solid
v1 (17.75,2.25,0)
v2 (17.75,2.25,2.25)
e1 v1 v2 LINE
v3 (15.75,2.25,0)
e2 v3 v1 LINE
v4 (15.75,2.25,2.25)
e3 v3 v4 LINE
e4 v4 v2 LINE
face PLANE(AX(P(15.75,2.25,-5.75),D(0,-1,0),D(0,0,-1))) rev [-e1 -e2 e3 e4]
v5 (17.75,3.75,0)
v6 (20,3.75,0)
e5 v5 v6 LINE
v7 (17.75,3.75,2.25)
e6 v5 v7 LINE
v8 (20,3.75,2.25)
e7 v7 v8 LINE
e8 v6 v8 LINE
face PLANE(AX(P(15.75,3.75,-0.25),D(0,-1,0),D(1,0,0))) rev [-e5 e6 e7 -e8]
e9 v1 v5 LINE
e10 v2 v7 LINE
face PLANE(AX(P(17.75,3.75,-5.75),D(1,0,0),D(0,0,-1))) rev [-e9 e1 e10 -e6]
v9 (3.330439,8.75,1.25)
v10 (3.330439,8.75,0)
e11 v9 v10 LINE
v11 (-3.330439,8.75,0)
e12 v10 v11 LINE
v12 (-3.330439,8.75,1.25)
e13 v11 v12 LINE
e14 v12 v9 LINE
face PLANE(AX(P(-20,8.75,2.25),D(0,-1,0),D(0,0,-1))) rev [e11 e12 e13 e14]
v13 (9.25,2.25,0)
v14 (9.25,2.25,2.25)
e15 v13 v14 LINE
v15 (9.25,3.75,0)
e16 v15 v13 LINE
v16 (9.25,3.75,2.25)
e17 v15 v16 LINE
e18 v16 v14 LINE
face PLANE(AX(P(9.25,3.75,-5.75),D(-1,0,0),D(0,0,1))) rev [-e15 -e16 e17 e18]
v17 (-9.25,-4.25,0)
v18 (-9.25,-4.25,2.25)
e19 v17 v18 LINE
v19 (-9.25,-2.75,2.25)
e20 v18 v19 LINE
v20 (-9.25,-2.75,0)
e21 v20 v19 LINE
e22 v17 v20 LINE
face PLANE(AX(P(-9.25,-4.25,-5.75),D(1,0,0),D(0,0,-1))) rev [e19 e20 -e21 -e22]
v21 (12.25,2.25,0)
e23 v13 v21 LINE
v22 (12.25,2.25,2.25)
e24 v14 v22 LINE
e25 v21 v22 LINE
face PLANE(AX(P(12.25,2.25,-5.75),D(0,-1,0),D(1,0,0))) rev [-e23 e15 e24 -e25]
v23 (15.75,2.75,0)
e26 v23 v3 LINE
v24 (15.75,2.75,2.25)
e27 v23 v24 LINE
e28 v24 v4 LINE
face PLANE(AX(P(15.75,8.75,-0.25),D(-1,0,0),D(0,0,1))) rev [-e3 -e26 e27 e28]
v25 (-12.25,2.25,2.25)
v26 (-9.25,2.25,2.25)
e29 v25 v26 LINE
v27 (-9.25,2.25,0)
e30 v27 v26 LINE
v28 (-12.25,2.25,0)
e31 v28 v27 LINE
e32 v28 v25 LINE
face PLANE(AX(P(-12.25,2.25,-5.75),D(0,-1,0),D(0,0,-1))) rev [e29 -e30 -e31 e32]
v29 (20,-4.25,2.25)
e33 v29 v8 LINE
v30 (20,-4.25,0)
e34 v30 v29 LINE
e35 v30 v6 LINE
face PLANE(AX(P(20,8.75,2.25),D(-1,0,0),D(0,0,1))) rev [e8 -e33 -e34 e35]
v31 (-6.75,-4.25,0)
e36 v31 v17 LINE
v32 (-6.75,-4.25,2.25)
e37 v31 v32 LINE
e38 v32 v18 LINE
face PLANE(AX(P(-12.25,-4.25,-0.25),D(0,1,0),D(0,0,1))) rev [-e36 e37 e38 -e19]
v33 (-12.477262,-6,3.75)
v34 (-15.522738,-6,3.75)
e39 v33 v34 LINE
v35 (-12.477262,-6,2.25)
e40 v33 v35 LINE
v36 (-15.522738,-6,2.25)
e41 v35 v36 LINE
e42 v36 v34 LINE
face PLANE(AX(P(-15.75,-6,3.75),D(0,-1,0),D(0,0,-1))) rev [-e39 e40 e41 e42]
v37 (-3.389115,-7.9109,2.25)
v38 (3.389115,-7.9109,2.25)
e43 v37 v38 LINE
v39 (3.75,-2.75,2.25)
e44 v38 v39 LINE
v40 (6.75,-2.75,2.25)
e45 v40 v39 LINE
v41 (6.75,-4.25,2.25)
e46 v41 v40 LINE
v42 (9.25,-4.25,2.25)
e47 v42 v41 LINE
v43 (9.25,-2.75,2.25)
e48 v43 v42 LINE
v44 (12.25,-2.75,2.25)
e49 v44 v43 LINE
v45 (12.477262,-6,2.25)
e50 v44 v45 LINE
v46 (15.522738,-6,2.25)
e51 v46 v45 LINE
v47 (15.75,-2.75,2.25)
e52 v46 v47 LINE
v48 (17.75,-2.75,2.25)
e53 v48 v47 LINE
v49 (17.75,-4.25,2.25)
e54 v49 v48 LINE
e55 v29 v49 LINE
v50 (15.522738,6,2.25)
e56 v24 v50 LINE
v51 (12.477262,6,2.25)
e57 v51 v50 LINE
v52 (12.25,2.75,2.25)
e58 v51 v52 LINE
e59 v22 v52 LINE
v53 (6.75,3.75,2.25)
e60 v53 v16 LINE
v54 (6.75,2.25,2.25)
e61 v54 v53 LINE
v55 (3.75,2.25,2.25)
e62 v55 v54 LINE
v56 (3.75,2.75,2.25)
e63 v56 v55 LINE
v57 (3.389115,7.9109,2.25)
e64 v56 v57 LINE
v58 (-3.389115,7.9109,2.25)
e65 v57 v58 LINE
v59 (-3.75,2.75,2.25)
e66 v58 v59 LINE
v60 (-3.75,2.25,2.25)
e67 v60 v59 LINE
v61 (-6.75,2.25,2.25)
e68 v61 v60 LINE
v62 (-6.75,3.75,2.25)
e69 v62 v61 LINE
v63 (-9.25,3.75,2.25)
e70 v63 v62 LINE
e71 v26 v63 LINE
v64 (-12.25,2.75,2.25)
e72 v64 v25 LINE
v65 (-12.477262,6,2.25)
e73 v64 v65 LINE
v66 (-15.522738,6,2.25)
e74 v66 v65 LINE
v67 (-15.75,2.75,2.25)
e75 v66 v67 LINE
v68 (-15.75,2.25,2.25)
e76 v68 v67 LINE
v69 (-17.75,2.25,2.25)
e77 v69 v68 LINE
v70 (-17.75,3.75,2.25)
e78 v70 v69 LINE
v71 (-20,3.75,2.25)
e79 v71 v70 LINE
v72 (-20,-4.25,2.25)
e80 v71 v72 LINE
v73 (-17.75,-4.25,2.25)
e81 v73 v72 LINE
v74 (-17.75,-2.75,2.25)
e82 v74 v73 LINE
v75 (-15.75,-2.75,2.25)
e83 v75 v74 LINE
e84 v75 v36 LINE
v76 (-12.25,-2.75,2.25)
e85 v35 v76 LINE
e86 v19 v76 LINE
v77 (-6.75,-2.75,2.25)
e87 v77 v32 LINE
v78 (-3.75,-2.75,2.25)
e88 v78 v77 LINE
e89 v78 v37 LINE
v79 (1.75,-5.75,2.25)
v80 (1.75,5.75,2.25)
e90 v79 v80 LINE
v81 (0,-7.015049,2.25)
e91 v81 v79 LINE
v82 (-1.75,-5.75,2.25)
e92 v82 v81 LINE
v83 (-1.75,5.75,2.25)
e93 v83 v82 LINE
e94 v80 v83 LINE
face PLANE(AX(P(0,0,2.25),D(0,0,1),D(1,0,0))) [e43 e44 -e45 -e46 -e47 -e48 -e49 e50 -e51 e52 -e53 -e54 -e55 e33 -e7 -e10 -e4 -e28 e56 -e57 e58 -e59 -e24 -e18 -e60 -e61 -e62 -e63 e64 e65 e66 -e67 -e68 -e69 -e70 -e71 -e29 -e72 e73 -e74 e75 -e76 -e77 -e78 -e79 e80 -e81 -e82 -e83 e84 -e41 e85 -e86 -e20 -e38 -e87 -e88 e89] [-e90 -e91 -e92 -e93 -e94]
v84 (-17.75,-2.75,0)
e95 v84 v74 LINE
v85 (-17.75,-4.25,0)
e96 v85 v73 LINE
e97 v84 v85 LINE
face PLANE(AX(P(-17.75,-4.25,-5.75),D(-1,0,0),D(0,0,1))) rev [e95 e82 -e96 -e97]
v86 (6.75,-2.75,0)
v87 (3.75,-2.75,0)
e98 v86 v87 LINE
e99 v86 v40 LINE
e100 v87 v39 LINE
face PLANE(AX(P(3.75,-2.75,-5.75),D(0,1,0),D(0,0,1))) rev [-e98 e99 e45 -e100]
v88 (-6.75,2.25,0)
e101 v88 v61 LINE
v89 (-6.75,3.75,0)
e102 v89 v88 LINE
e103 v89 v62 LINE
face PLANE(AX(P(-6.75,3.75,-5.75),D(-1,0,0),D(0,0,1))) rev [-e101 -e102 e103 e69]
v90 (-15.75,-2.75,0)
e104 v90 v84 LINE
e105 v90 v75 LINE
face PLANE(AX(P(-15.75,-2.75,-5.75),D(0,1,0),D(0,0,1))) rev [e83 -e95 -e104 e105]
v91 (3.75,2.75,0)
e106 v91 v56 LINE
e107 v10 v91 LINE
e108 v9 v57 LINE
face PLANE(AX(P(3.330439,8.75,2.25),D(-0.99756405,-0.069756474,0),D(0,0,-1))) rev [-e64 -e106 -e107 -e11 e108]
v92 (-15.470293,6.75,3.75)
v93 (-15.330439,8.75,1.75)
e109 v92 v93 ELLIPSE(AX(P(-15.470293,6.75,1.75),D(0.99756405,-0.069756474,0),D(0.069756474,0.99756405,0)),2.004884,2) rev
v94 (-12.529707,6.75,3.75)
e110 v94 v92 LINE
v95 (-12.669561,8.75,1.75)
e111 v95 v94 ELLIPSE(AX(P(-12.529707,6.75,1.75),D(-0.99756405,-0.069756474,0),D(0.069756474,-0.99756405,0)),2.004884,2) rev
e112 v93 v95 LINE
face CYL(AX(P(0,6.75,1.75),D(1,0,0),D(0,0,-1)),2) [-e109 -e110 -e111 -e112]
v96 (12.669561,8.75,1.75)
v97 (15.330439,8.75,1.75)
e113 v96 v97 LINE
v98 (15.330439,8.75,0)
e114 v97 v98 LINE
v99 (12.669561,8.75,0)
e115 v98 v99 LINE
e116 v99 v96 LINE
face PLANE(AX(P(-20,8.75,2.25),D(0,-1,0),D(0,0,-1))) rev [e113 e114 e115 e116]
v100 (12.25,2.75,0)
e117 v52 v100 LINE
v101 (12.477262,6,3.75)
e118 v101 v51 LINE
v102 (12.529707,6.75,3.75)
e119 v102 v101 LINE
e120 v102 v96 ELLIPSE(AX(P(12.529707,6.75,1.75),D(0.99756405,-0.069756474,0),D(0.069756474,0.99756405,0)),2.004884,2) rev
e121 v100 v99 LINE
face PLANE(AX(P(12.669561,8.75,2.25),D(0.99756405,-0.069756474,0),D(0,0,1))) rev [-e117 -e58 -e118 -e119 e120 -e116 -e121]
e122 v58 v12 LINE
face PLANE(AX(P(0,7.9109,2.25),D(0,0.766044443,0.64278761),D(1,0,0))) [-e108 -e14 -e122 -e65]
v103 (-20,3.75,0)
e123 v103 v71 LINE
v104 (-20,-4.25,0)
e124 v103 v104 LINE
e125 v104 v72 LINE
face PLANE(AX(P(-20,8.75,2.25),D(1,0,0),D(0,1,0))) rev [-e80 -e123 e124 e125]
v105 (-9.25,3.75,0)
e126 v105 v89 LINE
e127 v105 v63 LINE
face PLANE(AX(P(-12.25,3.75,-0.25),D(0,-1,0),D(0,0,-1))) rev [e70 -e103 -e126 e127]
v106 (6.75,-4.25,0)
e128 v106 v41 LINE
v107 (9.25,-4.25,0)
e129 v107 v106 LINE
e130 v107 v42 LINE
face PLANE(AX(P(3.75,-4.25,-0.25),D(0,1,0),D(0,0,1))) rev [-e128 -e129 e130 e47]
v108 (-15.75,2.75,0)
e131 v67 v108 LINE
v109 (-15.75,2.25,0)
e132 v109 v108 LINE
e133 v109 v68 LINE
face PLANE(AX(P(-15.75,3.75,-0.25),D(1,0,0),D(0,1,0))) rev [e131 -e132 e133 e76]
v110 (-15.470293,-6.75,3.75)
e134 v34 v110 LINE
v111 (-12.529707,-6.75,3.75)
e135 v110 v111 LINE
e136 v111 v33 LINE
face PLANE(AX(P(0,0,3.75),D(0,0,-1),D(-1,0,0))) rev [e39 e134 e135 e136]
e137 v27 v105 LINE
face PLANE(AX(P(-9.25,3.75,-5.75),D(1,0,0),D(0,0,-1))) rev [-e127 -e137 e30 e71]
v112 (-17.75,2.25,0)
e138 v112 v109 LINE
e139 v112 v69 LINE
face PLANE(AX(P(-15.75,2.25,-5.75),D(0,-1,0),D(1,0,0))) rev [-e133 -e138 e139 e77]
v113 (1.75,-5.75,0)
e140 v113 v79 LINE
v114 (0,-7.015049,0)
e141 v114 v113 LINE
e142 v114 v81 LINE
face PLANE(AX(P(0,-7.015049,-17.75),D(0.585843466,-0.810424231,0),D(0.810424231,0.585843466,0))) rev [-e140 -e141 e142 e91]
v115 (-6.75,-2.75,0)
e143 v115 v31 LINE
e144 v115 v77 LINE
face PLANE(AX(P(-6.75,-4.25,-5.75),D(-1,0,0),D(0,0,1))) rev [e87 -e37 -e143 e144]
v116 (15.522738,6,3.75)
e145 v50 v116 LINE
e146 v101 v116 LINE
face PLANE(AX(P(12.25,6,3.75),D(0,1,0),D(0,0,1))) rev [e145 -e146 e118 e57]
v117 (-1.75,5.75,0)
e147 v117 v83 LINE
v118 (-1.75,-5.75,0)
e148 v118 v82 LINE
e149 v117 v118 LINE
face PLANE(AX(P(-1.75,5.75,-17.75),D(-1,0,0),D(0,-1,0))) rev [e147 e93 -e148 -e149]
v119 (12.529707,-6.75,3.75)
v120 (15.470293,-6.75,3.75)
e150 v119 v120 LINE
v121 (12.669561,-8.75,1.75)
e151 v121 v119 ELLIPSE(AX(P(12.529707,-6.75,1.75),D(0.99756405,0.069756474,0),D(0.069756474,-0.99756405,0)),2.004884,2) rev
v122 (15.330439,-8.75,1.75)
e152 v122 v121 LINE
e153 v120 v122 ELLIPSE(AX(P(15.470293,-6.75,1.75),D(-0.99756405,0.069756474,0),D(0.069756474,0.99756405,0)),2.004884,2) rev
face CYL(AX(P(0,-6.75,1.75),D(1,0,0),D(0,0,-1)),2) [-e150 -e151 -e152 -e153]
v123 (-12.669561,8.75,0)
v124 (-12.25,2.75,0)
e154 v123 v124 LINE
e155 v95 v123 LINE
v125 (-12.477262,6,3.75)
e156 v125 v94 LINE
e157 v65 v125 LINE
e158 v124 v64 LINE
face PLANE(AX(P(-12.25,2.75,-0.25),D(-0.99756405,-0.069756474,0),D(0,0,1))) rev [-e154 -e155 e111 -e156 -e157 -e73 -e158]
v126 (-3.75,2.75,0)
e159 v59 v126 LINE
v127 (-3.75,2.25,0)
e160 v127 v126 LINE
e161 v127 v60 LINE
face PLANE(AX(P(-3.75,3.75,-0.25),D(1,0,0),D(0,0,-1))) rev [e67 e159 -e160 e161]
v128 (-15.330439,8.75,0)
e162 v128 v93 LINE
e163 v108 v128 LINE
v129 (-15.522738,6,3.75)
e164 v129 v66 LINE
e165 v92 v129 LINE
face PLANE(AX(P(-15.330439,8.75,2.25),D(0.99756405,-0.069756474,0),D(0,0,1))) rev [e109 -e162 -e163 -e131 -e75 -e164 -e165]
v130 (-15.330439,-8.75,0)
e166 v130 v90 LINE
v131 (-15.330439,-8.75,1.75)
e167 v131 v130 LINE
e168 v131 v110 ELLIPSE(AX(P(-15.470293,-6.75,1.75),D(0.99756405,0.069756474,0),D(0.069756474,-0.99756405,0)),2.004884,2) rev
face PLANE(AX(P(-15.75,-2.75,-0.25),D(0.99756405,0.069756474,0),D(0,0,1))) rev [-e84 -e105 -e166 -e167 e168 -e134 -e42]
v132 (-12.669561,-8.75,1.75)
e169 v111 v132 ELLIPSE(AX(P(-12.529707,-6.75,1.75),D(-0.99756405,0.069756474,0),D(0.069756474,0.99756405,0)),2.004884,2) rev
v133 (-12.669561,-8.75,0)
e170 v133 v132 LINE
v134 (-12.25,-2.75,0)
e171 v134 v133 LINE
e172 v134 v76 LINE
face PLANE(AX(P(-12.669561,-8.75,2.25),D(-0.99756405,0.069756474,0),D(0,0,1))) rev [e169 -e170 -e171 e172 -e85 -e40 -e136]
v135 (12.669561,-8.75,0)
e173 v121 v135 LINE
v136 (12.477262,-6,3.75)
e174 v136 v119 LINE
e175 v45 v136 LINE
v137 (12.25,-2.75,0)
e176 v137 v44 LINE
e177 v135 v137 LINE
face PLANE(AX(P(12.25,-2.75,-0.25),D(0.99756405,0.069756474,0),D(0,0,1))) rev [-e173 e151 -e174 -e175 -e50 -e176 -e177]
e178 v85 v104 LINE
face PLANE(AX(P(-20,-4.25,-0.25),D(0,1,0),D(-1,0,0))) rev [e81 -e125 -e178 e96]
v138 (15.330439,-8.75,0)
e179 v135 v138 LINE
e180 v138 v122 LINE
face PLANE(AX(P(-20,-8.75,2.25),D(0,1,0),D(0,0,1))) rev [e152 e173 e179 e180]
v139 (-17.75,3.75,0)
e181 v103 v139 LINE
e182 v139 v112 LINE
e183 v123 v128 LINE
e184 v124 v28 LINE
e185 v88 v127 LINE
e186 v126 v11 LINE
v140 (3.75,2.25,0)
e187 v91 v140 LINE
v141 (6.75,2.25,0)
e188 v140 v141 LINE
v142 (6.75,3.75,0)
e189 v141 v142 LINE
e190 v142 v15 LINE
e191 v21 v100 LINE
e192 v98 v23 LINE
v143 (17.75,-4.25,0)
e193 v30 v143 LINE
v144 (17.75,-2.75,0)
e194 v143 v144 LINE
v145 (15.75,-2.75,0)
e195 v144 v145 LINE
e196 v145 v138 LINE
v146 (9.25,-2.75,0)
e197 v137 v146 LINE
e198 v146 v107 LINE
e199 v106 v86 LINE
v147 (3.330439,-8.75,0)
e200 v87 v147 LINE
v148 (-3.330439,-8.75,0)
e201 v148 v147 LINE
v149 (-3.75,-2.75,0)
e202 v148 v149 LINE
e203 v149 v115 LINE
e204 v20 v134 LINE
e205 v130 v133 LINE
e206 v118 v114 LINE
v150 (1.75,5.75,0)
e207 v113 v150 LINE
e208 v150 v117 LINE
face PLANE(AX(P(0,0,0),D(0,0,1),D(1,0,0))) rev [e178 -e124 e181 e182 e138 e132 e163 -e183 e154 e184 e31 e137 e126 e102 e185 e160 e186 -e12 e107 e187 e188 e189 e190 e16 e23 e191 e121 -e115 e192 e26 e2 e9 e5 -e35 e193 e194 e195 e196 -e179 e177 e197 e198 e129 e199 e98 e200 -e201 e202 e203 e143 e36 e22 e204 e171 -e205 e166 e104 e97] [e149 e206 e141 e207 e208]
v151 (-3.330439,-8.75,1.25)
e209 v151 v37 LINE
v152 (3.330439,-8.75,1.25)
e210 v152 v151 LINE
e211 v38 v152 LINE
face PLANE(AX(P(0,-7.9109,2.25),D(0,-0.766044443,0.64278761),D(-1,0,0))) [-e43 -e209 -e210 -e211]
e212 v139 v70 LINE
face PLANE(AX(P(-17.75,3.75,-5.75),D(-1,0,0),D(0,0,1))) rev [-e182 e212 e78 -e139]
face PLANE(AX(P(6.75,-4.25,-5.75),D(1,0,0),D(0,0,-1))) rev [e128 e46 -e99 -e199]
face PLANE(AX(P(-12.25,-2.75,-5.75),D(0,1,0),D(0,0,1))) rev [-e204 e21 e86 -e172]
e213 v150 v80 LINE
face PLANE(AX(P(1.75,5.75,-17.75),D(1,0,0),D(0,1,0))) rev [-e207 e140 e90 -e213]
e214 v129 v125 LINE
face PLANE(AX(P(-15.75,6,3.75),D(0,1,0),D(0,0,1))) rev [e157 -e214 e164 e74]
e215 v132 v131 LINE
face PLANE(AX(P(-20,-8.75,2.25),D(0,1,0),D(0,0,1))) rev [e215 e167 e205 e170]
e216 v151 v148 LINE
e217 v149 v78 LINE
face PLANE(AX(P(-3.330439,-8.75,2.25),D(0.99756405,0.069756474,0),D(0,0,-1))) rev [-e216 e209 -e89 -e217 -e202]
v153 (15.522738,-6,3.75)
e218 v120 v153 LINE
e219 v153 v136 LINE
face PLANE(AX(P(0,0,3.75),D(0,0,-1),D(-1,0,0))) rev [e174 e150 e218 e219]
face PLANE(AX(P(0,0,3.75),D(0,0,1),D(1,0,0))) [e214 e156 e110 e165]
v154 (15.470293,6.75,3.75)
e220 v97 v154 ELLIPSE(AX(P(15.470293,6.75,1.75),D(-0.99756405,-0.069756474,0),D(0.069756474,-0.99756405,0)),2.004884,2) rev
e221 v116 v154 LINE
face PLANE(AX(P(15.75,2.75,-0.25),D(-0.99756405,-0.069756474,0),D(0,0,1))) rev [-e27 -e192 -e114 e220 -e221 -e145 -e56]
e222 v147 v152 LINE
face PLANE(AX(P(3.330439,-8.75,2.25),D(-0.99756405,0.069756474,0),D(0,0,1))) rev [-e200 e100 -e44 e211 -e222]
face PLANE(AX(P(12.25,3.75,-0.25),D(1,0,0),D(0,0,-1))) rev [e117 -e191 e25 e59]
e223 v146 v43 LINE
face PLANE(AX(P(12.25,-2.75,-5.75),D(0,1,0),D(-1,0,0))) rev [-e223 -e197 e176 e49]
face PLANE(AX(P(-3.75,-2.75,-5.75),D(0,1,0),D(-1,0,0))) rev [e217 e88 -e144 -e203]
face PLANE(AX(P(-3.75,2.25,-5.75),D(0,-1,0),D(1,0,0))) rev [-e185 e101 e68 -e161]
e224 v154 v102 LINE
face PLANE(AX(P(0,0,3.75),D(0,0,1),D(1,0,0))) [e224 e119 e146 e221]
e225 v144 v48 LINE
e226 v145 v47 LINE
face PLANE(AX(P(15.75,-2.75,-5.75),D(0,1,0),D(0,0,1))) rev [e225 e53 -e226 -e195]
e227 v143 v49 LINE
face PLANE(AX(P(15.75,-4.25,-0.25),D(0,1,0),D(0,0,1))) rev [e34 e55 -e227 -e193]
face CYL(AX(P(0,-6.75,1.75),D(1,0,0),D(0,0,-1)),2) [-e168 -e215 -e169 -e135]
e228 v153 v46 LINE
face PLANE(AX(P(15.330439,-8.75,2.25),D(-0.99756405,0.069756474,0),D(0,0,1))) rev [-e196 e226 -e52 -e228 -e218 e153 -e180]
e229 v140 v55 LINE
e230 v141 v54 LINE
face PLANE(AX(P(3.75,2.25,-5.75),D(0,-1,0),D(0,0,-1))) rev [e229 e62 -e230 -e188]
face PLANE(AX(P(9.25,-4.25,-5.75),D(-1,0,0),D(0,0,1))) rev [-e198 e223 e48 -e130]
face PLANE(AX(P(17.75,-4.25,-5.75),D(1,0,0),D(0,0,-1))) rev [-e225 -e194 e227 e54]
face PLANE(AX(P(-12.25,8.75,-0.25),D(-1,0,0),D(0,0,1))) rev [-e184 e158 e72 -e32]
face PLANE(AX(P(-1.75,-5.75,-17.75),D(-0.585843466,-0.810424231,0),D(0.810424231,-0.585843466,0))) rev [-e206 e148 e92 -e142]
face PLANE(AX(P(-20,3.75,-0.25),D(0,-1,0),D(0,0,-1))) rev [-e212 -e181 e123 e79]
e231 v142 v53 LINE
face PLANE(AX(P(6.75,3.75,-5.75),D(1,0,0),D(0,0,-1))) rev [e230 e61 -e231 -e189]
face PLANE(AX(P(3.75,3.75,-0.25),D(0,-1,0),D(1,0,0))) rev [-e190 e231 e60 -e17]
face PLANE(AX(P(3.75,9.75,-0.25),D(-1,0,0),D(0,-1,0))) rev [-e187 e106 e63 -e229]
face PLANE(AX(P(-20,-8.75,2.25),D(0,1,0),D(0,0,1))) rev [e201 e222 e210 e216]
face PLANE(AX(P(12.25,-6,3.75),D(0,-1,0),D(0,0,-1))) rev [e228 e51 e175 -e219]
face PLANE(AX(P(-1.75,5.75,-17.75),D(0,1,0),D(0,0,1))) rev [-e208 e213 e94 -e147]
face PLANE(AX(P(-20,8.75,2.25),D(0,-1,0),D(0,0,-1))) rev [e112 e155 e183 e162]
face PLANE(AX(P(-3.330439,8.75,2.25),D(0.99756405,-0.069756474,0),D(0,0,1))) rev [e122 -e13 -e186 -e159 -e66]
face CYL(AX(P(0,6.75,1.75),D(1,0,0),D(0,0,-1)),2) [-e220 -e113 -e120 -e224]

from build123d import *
from OCP.BRepFilletAPI import BRepFilletAPI_MakeChamfer

# Parameters (mm, degrees)
ESBO_O10_W               = 40
ESBO_O10_H               = 17.5
RESSALTO_EXTRUS_O6_DEPTH = 2.25
CORTE_EXTRUS_O2_DEPTH    = 2.5
ESBO_O12_W               = 3.5
ESBO_O12_H               = 2.75
RESSALTO_EXTRUS_O7_DEPTH = 1.5
ESBO_O13_W               = 3
ESBO_O13_H               = 1.5
ESBO_O13_W_2             = 2
CORTE_EXTRUS_O3_DEPTH    = 8
CORTE_EXTRUS_O4_DEPTH    = 20
CHANFRO5_SIZE            = 6
CHANFRO5_SIZE_2          = 0.419560872
CHANFRO6_SIZE            = 1
CHANFRO6_SIZE2           = 0.839099631
FILETE1_R                = 2


with BuildPart() as part:
    # Esboço10 → Ressalto-extrusão6 (new body)
    with BuildSketch(Plane.XY):
        Rectangle(ESBO_O10_W, ESBO_O10_H)
    extrude(amount=RESSALTO_EXTRUS_O6_DEPTH)

    # Esboço11 → Corte-extrusão2 (cut)
    with BuildSketch(Plane.XY.offset(2.25)):
        Polygon((-20, 3.75), (-15.75, 3.75), (-15.75, 8.75), (-12.25, 8.75), (-12.25, 3.75), (-3.75, 3.75), (-3.75, 9.75), (3.75, 9.75), (3.75, 3.75), (12.25, 3.75), (12.25, 8.75), (15.75, 8.75), (15.75, 3.75), (20, 3.75), (20, 11.902365005), (-20, 11.902365005), align=None)
        Polygon((-20, -4.25), (-15.75, -4.25), (-15.75, -8.75), (-12.25, -8.75), (-12.25, -4.25), (-3.75, -4.25), (-3.75, -10.25), (3.75, -9.74672567), (3.75, -4.25), (12.25, -4.25), (12.25, -8.75), (15.75, -8.75), (15.75, -4.25), (20, -4.25), (20, -11.31917021), (-20, -11.31917021), align=None)
    extrude(amount=-CORTE_EXTRUS_O2_DEPTH, mode=Mode.SUBTRACT)

    # Esboço12 → Ressalto-extrusão7 (add)
    with BuildSketch(Plane.XY.offset(2.25)):
        with Locations((-14, 7.375)):
            Rectangle(ESBO_O12_W, ESBO_O12_H)
        with Locations((-14, -7.375)):
            Rectangle(ESBO_O12_W, ESBO_O12_H)
        with Locations((14, -7.375)):
            Rectangle(ESBO_O12_W, ESBO_O12_H)
        with Locations((14, 7.375)):
            Rectangle(ESBO_O12_W, ESBO_O12_H)
    extrude(amount=RESSALTO_EXTRUS_O7_DEPTH)

    # Esboço13 → Corte-extrusão3 (cut)
    with BuildSketch(Plane.XY.offset(2.25)):
        with Locations((-10.75, 3)):
            Rectangle(ESBO_O13_W, ESBO_O13_H)
        with Locations((-5.25, 3)):
            Rectangle(ESBO_O13_W, ESBO_O13_H)
        with Locations((5.25, 3)):
            Rectangle(ESBO_O13_W, ESBO_O13_H)
        with Locations((10.75, 3)):
            Rectangle(ESBO_O13_W, ESBO_O13_H)
        with Locations((10.75, -3.5)):
            Rectangle(ESBO_O13_W, ESBO_O13_H)
        with Locations((5.25, -3.5)):
            Rectangle(ESBO_O13_W, ESBO_O13_H)
        with Locations((-5.25, -3.5)):
            Rectangle(ESBO_O13_W, ESBO_O13_H)
        with Locations((-10.75, -3.5)):
            Rectangle(ESBO_O13_W, ESBO_O13_H)
        with Locations((-16.75, -3.5)):
            Rectangle(ESBO_O13_W_2, ESBO_O13_H)
        with Locations((-16.75, 3)):
            Rectangle(ESBO_O13_W_2, ESBO_O13_H)
        with Locations((16.75, 3)):
            Rectangle(ESBO_O13_W_2, ESBO_O13_H)
        with Locations((16.75, -3.5)):
            Rectangle(ESBO_O13_W_2, ESBO_O13_H)
    extrude(amount=-CORTE_EXTRUS_O3_DEPTH, mode=Mode.SUBTRACT)

    # Esboço15 → Corte-extrusão4 (cut)
    with BuildSketch(Plane.XY.offset(2.25)):
        Polygon((-1.75, 5.75), (1.75, 5.75), (1.75, -5.75), (0, -7.015048633), (-1.75, -5.75), align=None)
    extrude(amount=-CORTE_EXTRUS_O4_DEPTH, mode=Mode.SUBTRACT)

    # Chanfro5
    chanfro5_edges_1 = [part.edges().sort_by_distance(p)[0] for p in [
        (-15.75, -8.75, 1.875),
    ]]
    chanfro5_side_1 = [part.faces().sort_by_distance(p)[0] for p in [
        (-15.75, -8.741608783, 1.875),
    ]]
    chanfro5_edges_2 = [part.edges().sort_by_distance(p)[0] for p in [
        (-3.75, -8.75, 1.125),
    ]]
    chanfro5_side_2 = [part.faces().sort_by_distance(p)[0] for p in [
        (-3.75, -8.741608783, 1.125),
    ]]
    chanfro5_edges_3 = [part.edges().sort_by_distance(p)[0] for p in [
        (12.25, -8.75, 1.875),
    ]]
    chanfro5_side_3 = [part.faces().sort_by_distance(p)[0] for p in [
        (12.25, -8.741608783, 1.875),
    ]]
    chanfro5_edges_4 = [part.edges().sort_by_distance(p)[0] for p in [
        (15.75, 8.75, 1.875),
    ]]
    chanfro5_side_4 = [part.faces().sort_by_distance(p)[0] for p in [
        (15.741608783, 8.75, 1.875),
    ]]
    chanfro5_edges_5 = [part.edges().sort_by_distance(p)[0] for p in [
        (3.75, 8.75, 1.125),
    ]]
    chanfro5_side_5 = [part.faces().sort_by_distance(p)[0] for p in [
        (3.741608783, 8.75, 1.125),
    ]]
    chanfro5_edges_6 = [part.edges().sort_by_distance(p)[0] for p in [
        (-12.25, 8.75, 1.875),
    ]]
    chanfro5_side_6 = [part.faces().sort_by_distance(p)[0] for p in [
        (-12.258391217, 8.75, 1.875),
    ]]
    chanfro5_edges_7 = [part.edges().sort_by_distance(p)[0] for p in [
        (-12.25, -8.75, 1.875),
    ]]
    chanfro5_side_7 = [part.faces().sort_by_distance(p)[0] for p in [
        (-12.258391217, -8.75, 1.875),
    ]]
    chanfro5_edges_8 = [part.edges().sort_by_distance(p)[0] for p in [
        (3.75, -8.75, 1.125),
    ]]
    chanfro5_side_8 = [part.faces().sort_by_distance(p)[0] for p in [
        (3.741608783, -8.75, 1.125),
    ]]
    chanfro5_edges_9 = [part.edges().sort_by_distance(p)[0] for p in [
        (15.75, -8.75, 1.875),
    ]]
    chanfro5_side_9 = [part.faces().sort_by_distance(p)[0] for p in [
        (15.741608783, -8.75, 1.875),
    ]]
    chanfro5_edges_10 = [part.edges().sort_by_distance(p)[0] for p in [
        (12.25, 8.75, 1.875),
    ]]
    chanfro5_side_10 = [part.faces().sort_by_distance(p)[0] for p in [
        (12.25, 8.741608783, 1.875),
    ]]
    chanfro5_edges_11 = [part.edges().sort_by_distance(p)[0] for p in [
        (-3.75, 8.75, 1.125),
    ]]
    chanfro5_side_11 = [part.faces().sort_by_distance(p)[0] for p in [
        (-3.75, 8.741608783, 1.125),
    ]]
    chanfro5_edges_12 = [part.edges().sort_by_distance(p)[0] for p in [
        (-15.75, 8.75, 1.875),
    ]]
    chanfro5_side_12 = [part.faces().sort_by_distance(p)[0] for p in [
        (-15.741608783, 8.75, 1.875),
    ]]
    chanfro5 = BRepFilletAPI_MakeChamfer(part.part.solid().wrapped)
    for e in chanfro5_edges_1:
        chanfro5.Add(CHANFRO5_SIZE - 0.0001, CHANFRO5_SIZE_2 - 0.0001, e.wrapped, chanfro5_side_1[0].wrapped)
    for e in chanfro5_edges_2:
        chanfro5.Add(CHANFRO5_SIZE - 0.0001, CHANFRO5_SIZE_2 - 0.0001, e.wrapped, chanfro5_side_2[0].wrapped)
    for e in chanfro5_edges_3:
        chanfro5.Add(CHANFRO5_SIZE - 0.0001, CHANFRO5_SIZE_2 - 0.0001, e.wrapped, chanfro5_side_3[0].wrapped)
    for e in chanfro5_edges_4:
        chanfro5.Add(CHANFRO5_SIZE_2 - 0.0001, CHANFRO5_SIZE - 0.0001, e.wrapped, chanfro5_side_4[0].wrapped)
    for e in chanfro5_edges_5:
        chanfro5.Add(CHANFRO5_SIZE_2 - 0.0001, CHANFRO5_SIZE - 0.0001, e.wrapped, chanfro5_side_5[0].wrapped)
    for e in chanfro5_edges_6:
        chanfro5.Add(CHANFRO5_SIZE_2 - 0.0001, CHANFRO5_SIZE - 0.0001, e.wrapped, chanfro5_side_6[0].wrapped)
    for e in chanfro5_edges_7:
        chanfro5.Add(CHANFRO5_SIZE_2 - 0.0001, CHANFRO5_SIZE - 0.0001, e.wrapped, chanfro5_side_7[0].wrapped)
    for e in chanfro5_edges_8:
        chanfro5.Add(CHANFRO5_SIZE_2 - 0.0001, CHANFRO5_SIZE - 0.0001, e.wrapped, chanfro5_side_8[0].wrapped)
    for e in chanfro5_edges_9:
        chanfro5.Add(CHANFRO5_SIZE_2 - 0.0001, CHANFRO5_SIZE - 0.0001, e.wrapped, chanfro5_side_9[0].wrapped)
    for e in chanfro5_edges_10:
        chanfro5.Add(CHANFRO5_SIZE - 0.0001, CHANFRO5_SIZE_2 - 0.0001, e.wrapped, chanfro5_side_10[0].wrapped)
    for e in chanfro5_edges_11:
        chanfro5.Add(CHANFRO5_SIZE - 0.0001, CHANFRO5_SIZE_2 - 0.0001, e.wrapped, chanfro5_side_11[0].wrapped)
    for e in chanfro5_edges_12:
        chanfro5.Add(CHANFRO5_SIZE_2 - 0.0001, CHANFRO5_SIZE - 0.0001, e.wrapped, chanfro5_side_12[0].wrapped)
    add(Compound.cast(chanfro5.Shape()), mode=Mode.REPLACE)  # a hair under: the kernel refuses the full size

    # Chanfro6: one chamfer whose edges measure the first distance from different faces: ONE call of the kernel's chamfer builder (chamfer() names one face for all edges)
    chanfro6_edges_1 = [part.edges().sort_by_distance(p)[0] for p in [
        (0, -8.75, 2.25),
    ]]
    chanfro6_side_1 = [part.faces().sort_by_distance(p)[0] for p in [
        (0, -8.75, 1.125),
    ]]
    chanfro6_edges_2 = [part.edges().sort_by_distance(p)[0] for p in [
        (0, 8.75, 2.25),
    ]]
    chanfro6_side_2 = [part.faces().sort_by_distance(p)[0] for p in [
        (0, 8.75, 1.125),
    ]]
    chanfro6 = BRepFilletAPI_MakeChamfer(part.part.solid().wrapped)
    for e in chanfro6_edges_1:
        chanfro6.Add(CHANFRO6_SIZE, CHANFRO6_SIZE2, e.wrapped, chanfro6_side_1[0].wrapped)  # the first distance lies on this face
    for e in chanfro6_edges_2:
        chanfro6.Add(CHANFRO6_SIZE, CHANFRO6_SIZE2, e.wrapped, chanfro6_side_2[0].wrapped)  # the first distance lies on this face
    add(Compound.cast(chanfro6.Shape()), mode=Mode.REPLACE)

    # Filete1
    filete1_edges = [part.edges().sort_by_distance(p)[0] for p in [
        (-14, -8.75, 3.75),
        (14, -8.75, 3.75),
        (14, 8.75, 3.75),
        (-14, 8.75, 3.75),
    ]]
    fillet(filete1_edges, radius=FILETE1_R)


solid = part.part
